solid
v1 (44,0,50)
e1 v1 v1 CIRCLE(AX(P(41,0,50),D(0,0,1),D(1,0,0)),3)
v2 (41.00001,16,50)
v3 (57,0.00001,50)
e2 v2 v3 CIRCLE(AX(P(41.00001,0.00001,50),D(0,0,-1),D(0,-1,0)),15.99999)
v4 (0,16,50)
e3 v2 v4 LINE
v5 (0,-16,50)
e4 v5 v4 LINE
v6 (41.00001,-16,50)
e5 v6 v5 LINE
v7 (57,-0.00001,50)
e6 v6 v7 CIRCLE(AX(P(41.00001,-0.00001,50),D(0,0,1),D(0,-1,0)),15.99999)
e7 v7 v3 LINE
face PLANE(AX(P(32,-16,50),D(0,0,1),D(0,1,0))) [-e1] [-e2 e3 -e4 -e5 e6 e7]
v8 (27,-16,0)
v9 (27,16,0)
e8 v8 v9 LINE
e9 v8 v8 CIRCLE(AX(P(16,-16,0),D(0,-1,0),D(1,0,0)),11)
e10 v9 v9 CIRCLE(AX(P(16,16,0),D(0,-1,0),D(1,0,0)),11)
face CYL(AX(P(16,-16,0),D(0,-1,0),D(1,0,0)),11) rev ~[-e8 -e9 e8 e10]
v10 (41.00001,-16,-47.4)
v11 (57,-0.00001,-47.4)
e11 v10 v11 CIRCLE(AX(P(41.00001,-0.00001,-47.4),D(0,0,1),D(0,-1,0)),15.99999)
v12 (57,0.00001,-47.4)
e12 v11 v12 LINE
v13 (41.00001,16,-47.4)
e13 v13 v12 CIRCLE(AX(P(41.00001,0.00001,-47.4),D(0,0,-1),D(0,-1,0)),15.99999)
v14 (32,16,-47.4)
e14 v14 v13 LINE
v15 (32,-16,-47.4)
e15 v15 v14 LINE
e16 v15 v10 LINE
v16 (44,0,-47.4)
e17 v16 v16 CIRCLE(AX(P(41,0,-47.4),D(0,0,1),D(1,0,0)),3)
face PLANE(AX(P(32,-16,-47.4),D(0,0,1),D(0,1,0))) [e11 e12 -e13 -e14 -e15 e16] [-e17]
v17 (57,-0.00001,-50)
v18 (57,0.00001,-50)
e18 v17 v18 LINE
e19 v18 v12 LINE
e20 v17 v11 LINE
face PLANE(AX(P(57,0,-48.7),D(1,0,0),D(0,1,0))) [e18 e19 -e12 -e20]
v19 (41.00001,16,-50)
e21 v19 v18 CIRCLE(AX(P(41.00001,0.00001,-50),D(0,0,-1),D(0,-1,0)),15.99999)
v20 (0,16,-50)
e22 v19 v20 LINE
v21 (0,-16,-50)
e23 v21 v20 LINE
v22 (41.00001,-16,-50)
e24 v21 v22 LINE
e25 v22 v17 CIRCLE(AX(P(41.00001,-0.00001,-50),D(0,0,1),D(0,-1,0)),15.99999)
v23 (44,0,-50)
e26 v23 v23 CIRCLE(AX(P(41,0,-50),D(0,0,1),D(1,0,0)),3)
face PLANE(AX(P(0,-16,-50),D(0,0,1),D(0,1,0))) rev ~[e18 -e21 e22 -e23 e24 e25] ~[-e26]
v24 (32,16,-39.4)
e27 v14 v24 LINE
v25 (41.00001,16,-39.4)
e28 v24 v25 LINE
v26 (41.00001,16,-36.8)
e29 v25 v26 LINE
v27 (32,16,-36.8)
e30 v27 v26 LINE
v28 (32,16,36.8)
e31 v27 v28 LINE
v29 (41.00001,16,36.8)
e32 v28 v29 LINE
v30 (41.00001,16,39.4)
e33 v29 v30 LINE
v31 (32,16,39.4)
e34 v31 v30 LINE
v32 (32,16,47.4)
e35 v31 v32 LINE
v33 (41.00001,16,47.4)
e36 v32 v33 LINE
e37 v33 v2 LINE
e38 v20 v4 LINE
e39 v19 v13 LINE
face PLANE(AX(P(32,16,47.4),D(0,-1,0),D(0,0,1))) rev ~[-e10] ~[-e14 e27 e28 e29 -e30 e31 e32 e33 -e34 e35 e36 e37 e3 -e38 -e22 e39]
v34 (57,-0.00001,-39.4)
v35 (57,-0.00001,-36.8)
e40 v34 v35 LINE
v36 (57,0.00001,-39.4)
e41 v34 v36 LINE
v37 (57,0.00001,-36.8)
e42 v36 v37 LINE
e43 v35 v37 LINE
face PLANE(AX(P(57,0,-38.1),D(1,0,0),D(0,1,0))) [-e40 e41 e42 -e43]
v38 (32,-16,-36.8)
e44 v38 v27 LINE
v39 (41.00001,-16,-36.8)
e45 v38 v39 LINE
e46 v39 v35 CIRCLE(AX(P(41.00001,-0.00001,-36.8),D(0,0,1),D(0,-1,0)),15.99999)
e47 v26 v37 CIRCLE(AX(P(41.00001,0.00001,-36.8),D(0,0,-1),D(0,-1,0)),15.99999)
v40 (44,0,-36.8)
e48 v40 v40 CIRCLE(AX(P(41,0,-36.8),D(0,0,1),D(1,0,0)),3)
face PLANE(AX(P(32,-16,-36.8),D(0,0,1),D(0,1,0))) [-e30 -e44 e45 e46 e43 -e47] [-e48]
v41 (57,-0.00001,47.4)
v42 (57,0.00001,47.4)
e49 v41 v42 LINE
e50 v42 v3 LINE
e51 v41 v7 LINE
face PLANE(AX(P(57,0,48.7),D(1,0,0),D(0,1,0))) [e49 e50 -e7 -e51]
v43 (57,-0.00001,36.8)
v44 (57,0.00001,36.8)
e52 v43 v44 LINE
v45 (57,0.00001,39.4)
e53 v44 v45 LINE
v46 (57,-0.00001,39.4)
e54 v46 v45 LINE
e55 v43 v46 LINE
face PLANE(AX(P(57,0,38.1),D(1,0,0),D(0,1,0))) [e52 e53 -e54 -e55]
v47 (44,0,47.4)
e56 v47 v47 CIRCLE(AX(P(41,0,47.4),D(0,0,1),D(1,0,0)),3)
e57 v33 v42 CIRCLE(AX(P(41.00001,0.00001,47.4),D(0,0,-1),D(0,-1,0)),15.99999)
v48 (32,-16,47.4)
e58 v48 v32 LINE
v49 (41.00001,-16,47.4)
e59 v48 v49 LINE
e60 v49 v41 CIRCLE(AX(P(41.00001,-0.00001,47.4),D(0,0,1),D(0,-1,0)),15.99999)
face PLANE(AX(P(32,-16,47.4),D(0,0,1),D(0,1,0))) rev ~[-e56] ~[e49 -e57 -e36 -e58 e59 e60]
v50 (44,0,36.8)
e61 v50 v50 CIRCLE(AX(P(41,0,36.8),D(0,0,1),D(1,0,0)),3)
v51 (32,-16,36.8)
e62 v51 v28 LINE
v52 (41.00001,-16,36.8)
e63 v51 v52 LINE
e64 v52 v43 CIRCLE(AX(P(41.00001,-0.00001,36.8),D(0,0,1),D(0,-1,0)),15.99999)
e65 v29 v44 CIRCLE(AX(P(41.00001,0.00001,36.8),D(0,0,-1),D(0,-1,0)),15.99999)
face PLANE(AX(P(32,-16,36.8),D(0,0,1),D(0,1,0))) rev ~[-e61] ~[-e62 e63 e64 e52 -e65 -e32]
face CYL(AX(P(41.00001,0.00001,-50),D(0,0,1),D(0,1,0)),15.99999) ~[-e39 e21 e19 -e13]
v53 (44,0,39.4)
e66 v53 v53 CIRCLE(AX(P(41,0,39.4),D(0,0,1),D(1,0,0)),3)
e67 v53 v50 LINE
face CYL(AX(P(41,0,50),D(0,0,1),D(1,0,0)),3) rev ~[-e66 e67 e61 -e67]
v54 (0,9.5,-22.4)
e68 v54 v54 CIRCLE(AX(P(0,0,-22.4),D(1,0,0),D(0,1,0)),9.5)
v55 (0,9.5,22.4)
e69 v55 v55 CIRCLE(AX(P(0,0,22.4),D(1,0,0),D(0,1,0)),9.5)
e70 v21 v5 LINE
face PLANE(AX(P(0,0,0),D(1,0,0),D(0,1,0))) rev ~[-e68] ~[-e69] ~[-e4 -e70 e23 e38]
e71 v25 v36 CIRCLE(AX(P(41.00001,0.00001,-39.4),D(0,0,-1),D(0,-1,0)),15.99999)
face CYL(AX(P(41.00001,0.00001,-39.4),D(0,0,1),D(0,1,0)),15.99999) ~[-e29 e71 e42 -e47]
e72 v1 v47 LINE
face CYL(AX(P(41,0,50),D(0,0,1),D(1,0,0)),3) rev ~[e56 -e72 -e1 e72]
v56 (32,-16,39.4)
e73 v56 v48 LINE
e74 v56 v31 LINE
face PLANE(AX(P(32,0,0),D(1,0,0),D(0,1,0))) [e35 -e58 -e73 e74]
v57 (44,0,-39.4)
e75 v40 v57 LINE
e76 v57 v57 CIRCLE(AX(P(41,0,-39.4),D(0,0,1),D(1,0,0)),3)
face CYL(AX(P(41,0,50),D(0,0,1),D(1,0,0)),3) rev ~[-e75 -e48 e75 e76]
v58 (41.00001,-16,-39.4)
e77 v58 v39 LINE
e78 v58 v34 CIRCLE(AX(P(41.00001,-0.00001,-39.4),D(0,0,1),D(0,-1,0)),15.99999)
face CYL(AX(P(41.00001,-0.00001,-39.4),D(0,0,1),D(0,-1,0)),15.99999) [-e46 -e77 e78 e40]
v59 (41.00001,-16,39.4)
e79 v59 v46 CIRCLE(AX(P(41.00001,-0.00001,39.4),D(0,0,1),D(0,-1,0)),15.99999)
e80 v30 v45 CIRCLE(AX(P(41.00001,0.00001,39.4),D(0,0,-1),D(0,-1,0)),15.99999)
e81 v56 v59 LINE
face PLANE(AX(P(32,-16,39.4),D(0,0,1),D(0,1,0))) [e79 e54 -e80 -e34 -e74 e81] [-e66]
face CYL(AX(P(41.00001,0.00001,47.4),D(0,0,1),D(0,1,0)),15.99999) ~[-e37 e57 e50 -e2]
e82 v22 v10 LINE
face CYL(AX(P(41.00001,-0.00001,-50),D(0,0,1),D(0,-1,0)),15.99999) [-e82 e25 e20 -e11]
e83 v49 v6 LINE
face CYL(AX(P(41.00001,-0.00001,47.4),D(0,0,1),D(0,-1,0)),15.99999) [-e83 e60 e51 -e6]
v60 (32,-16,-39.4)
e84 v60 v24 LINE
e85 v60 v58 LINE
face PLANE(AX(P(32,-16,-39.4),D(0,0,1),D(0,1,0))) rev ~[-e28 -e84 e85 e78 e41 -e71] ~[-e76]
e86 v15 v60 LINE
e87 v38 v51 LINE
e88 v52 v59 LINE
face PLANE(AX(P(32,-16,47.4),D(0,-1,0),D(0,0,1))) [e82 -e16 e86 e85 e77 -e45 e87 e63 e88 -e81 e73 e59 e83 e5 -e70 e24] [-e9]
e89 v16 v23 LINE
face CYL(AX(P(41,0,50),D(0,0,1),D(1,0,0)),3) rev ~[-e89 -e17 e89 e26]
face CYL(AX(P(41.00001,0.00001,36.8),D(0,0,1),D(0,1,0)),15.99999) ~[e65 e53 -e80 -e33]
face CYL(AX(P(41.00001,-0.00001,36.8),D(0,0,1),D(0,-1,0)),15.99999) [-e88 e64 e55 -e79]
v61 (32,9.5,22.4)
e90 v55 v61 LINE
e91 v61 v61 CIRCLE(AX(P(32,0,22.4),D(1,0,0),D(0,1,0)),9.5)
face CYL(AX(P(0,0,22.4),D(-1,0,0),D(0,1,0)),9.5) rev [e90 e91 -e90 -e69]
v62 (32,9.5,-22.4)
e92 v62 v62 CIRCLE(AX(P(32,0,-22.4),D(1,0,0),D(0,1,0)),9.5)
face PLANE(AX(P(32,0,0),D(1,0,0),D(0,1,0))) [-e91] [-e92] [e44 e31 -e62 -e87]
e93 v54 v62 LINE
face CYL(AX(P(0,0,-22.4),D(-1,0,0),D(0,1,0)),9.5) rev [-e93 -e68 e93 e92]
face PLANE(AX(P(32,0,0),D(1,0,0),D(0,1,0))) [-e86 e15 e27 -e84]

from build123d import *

# Parameters (mm, degrees)
F0_W     = 32
F0_H     = 100
F0_R     = 9.5
F1_DEPTH = 32
F2_R     = 11
F3_DEPTH = 32.001
F4_W     = 32
F4_H     = 2.6
F5_DEPTH = 25
F6_R     = 15.99999
F7_R     = 3
F8_DEPTH = 100.001


# Not quite as in the source:
# - a fillet or chamfer is up to 0.001 mm smaller than in the source, because OpenCascade refuses the exact size


with BuildPart() as f1:
    # F0 (on Right) → F1 (new body)
    with BuildSketch(Plane.YZ):
        Rectangle(F0_W, F0_H)
        with Locations((0, -22.4)):
            Circle(F0_R, mode=Mode.SUBTRACT)
        with Locations((0, 22.4)):
            Circle(F0_R, mode=Mode.SUBTRACT)
    extrude(amount=F1_DEPTH)

    # F2 (on face) → F3 (cut, through all)
    with BuildSketch(Plane.XZ.offset(16)):
        with Locations((16, 0)):
            Circle(F2_R)
    extrude(amount=-F3_DEPTH, mode=Mode.SUBTRACT)

    # F4 (on face) → F5 (join)
    with BuildSketch(Plane.YZ.offset(32)):
        with Locations((0, 48.7)):
            Rectangle(F4_W, F4_H)
        with Locations((0, 38.1)):
            Rectangle(F4_W, F4_H)
        with Locations((0, -38.1)):
            Rectangle(F4_W, F4_H)
        with Locations((0, -48.7)):
            Rectangle(F4_W, F4_H)
    extrude(amount=F5_DEPTH)

    # F6 (radius 16 in the source; OpenCascade refuses exactly that, so slightly less here)
    f6_edges = [f1.edges().sort_by_distance(p)[0] for p in [
        (57, -16, 48.7),
        (57, -16, 38.1),
        (57, 16, 38.1),
        (57, 16, 48.7),
        (57, 16, -48.7),
        (57, -16, -48.7),
        (57, -16, -38.1),
        (57, 16, -38.1),
    ]]
    fillet(f6_edges, radius=F6_R)

    # F7 (on face) → F8 (cut, through all)
    with BuildSketch(Plane.XY.offset(50)):
        with Locations((41, 0)):
            Circle(F7_R)
    extrude(amount=-F8_DEPTH, mode=Mode.SUBTRACT)


solid = f1.part
